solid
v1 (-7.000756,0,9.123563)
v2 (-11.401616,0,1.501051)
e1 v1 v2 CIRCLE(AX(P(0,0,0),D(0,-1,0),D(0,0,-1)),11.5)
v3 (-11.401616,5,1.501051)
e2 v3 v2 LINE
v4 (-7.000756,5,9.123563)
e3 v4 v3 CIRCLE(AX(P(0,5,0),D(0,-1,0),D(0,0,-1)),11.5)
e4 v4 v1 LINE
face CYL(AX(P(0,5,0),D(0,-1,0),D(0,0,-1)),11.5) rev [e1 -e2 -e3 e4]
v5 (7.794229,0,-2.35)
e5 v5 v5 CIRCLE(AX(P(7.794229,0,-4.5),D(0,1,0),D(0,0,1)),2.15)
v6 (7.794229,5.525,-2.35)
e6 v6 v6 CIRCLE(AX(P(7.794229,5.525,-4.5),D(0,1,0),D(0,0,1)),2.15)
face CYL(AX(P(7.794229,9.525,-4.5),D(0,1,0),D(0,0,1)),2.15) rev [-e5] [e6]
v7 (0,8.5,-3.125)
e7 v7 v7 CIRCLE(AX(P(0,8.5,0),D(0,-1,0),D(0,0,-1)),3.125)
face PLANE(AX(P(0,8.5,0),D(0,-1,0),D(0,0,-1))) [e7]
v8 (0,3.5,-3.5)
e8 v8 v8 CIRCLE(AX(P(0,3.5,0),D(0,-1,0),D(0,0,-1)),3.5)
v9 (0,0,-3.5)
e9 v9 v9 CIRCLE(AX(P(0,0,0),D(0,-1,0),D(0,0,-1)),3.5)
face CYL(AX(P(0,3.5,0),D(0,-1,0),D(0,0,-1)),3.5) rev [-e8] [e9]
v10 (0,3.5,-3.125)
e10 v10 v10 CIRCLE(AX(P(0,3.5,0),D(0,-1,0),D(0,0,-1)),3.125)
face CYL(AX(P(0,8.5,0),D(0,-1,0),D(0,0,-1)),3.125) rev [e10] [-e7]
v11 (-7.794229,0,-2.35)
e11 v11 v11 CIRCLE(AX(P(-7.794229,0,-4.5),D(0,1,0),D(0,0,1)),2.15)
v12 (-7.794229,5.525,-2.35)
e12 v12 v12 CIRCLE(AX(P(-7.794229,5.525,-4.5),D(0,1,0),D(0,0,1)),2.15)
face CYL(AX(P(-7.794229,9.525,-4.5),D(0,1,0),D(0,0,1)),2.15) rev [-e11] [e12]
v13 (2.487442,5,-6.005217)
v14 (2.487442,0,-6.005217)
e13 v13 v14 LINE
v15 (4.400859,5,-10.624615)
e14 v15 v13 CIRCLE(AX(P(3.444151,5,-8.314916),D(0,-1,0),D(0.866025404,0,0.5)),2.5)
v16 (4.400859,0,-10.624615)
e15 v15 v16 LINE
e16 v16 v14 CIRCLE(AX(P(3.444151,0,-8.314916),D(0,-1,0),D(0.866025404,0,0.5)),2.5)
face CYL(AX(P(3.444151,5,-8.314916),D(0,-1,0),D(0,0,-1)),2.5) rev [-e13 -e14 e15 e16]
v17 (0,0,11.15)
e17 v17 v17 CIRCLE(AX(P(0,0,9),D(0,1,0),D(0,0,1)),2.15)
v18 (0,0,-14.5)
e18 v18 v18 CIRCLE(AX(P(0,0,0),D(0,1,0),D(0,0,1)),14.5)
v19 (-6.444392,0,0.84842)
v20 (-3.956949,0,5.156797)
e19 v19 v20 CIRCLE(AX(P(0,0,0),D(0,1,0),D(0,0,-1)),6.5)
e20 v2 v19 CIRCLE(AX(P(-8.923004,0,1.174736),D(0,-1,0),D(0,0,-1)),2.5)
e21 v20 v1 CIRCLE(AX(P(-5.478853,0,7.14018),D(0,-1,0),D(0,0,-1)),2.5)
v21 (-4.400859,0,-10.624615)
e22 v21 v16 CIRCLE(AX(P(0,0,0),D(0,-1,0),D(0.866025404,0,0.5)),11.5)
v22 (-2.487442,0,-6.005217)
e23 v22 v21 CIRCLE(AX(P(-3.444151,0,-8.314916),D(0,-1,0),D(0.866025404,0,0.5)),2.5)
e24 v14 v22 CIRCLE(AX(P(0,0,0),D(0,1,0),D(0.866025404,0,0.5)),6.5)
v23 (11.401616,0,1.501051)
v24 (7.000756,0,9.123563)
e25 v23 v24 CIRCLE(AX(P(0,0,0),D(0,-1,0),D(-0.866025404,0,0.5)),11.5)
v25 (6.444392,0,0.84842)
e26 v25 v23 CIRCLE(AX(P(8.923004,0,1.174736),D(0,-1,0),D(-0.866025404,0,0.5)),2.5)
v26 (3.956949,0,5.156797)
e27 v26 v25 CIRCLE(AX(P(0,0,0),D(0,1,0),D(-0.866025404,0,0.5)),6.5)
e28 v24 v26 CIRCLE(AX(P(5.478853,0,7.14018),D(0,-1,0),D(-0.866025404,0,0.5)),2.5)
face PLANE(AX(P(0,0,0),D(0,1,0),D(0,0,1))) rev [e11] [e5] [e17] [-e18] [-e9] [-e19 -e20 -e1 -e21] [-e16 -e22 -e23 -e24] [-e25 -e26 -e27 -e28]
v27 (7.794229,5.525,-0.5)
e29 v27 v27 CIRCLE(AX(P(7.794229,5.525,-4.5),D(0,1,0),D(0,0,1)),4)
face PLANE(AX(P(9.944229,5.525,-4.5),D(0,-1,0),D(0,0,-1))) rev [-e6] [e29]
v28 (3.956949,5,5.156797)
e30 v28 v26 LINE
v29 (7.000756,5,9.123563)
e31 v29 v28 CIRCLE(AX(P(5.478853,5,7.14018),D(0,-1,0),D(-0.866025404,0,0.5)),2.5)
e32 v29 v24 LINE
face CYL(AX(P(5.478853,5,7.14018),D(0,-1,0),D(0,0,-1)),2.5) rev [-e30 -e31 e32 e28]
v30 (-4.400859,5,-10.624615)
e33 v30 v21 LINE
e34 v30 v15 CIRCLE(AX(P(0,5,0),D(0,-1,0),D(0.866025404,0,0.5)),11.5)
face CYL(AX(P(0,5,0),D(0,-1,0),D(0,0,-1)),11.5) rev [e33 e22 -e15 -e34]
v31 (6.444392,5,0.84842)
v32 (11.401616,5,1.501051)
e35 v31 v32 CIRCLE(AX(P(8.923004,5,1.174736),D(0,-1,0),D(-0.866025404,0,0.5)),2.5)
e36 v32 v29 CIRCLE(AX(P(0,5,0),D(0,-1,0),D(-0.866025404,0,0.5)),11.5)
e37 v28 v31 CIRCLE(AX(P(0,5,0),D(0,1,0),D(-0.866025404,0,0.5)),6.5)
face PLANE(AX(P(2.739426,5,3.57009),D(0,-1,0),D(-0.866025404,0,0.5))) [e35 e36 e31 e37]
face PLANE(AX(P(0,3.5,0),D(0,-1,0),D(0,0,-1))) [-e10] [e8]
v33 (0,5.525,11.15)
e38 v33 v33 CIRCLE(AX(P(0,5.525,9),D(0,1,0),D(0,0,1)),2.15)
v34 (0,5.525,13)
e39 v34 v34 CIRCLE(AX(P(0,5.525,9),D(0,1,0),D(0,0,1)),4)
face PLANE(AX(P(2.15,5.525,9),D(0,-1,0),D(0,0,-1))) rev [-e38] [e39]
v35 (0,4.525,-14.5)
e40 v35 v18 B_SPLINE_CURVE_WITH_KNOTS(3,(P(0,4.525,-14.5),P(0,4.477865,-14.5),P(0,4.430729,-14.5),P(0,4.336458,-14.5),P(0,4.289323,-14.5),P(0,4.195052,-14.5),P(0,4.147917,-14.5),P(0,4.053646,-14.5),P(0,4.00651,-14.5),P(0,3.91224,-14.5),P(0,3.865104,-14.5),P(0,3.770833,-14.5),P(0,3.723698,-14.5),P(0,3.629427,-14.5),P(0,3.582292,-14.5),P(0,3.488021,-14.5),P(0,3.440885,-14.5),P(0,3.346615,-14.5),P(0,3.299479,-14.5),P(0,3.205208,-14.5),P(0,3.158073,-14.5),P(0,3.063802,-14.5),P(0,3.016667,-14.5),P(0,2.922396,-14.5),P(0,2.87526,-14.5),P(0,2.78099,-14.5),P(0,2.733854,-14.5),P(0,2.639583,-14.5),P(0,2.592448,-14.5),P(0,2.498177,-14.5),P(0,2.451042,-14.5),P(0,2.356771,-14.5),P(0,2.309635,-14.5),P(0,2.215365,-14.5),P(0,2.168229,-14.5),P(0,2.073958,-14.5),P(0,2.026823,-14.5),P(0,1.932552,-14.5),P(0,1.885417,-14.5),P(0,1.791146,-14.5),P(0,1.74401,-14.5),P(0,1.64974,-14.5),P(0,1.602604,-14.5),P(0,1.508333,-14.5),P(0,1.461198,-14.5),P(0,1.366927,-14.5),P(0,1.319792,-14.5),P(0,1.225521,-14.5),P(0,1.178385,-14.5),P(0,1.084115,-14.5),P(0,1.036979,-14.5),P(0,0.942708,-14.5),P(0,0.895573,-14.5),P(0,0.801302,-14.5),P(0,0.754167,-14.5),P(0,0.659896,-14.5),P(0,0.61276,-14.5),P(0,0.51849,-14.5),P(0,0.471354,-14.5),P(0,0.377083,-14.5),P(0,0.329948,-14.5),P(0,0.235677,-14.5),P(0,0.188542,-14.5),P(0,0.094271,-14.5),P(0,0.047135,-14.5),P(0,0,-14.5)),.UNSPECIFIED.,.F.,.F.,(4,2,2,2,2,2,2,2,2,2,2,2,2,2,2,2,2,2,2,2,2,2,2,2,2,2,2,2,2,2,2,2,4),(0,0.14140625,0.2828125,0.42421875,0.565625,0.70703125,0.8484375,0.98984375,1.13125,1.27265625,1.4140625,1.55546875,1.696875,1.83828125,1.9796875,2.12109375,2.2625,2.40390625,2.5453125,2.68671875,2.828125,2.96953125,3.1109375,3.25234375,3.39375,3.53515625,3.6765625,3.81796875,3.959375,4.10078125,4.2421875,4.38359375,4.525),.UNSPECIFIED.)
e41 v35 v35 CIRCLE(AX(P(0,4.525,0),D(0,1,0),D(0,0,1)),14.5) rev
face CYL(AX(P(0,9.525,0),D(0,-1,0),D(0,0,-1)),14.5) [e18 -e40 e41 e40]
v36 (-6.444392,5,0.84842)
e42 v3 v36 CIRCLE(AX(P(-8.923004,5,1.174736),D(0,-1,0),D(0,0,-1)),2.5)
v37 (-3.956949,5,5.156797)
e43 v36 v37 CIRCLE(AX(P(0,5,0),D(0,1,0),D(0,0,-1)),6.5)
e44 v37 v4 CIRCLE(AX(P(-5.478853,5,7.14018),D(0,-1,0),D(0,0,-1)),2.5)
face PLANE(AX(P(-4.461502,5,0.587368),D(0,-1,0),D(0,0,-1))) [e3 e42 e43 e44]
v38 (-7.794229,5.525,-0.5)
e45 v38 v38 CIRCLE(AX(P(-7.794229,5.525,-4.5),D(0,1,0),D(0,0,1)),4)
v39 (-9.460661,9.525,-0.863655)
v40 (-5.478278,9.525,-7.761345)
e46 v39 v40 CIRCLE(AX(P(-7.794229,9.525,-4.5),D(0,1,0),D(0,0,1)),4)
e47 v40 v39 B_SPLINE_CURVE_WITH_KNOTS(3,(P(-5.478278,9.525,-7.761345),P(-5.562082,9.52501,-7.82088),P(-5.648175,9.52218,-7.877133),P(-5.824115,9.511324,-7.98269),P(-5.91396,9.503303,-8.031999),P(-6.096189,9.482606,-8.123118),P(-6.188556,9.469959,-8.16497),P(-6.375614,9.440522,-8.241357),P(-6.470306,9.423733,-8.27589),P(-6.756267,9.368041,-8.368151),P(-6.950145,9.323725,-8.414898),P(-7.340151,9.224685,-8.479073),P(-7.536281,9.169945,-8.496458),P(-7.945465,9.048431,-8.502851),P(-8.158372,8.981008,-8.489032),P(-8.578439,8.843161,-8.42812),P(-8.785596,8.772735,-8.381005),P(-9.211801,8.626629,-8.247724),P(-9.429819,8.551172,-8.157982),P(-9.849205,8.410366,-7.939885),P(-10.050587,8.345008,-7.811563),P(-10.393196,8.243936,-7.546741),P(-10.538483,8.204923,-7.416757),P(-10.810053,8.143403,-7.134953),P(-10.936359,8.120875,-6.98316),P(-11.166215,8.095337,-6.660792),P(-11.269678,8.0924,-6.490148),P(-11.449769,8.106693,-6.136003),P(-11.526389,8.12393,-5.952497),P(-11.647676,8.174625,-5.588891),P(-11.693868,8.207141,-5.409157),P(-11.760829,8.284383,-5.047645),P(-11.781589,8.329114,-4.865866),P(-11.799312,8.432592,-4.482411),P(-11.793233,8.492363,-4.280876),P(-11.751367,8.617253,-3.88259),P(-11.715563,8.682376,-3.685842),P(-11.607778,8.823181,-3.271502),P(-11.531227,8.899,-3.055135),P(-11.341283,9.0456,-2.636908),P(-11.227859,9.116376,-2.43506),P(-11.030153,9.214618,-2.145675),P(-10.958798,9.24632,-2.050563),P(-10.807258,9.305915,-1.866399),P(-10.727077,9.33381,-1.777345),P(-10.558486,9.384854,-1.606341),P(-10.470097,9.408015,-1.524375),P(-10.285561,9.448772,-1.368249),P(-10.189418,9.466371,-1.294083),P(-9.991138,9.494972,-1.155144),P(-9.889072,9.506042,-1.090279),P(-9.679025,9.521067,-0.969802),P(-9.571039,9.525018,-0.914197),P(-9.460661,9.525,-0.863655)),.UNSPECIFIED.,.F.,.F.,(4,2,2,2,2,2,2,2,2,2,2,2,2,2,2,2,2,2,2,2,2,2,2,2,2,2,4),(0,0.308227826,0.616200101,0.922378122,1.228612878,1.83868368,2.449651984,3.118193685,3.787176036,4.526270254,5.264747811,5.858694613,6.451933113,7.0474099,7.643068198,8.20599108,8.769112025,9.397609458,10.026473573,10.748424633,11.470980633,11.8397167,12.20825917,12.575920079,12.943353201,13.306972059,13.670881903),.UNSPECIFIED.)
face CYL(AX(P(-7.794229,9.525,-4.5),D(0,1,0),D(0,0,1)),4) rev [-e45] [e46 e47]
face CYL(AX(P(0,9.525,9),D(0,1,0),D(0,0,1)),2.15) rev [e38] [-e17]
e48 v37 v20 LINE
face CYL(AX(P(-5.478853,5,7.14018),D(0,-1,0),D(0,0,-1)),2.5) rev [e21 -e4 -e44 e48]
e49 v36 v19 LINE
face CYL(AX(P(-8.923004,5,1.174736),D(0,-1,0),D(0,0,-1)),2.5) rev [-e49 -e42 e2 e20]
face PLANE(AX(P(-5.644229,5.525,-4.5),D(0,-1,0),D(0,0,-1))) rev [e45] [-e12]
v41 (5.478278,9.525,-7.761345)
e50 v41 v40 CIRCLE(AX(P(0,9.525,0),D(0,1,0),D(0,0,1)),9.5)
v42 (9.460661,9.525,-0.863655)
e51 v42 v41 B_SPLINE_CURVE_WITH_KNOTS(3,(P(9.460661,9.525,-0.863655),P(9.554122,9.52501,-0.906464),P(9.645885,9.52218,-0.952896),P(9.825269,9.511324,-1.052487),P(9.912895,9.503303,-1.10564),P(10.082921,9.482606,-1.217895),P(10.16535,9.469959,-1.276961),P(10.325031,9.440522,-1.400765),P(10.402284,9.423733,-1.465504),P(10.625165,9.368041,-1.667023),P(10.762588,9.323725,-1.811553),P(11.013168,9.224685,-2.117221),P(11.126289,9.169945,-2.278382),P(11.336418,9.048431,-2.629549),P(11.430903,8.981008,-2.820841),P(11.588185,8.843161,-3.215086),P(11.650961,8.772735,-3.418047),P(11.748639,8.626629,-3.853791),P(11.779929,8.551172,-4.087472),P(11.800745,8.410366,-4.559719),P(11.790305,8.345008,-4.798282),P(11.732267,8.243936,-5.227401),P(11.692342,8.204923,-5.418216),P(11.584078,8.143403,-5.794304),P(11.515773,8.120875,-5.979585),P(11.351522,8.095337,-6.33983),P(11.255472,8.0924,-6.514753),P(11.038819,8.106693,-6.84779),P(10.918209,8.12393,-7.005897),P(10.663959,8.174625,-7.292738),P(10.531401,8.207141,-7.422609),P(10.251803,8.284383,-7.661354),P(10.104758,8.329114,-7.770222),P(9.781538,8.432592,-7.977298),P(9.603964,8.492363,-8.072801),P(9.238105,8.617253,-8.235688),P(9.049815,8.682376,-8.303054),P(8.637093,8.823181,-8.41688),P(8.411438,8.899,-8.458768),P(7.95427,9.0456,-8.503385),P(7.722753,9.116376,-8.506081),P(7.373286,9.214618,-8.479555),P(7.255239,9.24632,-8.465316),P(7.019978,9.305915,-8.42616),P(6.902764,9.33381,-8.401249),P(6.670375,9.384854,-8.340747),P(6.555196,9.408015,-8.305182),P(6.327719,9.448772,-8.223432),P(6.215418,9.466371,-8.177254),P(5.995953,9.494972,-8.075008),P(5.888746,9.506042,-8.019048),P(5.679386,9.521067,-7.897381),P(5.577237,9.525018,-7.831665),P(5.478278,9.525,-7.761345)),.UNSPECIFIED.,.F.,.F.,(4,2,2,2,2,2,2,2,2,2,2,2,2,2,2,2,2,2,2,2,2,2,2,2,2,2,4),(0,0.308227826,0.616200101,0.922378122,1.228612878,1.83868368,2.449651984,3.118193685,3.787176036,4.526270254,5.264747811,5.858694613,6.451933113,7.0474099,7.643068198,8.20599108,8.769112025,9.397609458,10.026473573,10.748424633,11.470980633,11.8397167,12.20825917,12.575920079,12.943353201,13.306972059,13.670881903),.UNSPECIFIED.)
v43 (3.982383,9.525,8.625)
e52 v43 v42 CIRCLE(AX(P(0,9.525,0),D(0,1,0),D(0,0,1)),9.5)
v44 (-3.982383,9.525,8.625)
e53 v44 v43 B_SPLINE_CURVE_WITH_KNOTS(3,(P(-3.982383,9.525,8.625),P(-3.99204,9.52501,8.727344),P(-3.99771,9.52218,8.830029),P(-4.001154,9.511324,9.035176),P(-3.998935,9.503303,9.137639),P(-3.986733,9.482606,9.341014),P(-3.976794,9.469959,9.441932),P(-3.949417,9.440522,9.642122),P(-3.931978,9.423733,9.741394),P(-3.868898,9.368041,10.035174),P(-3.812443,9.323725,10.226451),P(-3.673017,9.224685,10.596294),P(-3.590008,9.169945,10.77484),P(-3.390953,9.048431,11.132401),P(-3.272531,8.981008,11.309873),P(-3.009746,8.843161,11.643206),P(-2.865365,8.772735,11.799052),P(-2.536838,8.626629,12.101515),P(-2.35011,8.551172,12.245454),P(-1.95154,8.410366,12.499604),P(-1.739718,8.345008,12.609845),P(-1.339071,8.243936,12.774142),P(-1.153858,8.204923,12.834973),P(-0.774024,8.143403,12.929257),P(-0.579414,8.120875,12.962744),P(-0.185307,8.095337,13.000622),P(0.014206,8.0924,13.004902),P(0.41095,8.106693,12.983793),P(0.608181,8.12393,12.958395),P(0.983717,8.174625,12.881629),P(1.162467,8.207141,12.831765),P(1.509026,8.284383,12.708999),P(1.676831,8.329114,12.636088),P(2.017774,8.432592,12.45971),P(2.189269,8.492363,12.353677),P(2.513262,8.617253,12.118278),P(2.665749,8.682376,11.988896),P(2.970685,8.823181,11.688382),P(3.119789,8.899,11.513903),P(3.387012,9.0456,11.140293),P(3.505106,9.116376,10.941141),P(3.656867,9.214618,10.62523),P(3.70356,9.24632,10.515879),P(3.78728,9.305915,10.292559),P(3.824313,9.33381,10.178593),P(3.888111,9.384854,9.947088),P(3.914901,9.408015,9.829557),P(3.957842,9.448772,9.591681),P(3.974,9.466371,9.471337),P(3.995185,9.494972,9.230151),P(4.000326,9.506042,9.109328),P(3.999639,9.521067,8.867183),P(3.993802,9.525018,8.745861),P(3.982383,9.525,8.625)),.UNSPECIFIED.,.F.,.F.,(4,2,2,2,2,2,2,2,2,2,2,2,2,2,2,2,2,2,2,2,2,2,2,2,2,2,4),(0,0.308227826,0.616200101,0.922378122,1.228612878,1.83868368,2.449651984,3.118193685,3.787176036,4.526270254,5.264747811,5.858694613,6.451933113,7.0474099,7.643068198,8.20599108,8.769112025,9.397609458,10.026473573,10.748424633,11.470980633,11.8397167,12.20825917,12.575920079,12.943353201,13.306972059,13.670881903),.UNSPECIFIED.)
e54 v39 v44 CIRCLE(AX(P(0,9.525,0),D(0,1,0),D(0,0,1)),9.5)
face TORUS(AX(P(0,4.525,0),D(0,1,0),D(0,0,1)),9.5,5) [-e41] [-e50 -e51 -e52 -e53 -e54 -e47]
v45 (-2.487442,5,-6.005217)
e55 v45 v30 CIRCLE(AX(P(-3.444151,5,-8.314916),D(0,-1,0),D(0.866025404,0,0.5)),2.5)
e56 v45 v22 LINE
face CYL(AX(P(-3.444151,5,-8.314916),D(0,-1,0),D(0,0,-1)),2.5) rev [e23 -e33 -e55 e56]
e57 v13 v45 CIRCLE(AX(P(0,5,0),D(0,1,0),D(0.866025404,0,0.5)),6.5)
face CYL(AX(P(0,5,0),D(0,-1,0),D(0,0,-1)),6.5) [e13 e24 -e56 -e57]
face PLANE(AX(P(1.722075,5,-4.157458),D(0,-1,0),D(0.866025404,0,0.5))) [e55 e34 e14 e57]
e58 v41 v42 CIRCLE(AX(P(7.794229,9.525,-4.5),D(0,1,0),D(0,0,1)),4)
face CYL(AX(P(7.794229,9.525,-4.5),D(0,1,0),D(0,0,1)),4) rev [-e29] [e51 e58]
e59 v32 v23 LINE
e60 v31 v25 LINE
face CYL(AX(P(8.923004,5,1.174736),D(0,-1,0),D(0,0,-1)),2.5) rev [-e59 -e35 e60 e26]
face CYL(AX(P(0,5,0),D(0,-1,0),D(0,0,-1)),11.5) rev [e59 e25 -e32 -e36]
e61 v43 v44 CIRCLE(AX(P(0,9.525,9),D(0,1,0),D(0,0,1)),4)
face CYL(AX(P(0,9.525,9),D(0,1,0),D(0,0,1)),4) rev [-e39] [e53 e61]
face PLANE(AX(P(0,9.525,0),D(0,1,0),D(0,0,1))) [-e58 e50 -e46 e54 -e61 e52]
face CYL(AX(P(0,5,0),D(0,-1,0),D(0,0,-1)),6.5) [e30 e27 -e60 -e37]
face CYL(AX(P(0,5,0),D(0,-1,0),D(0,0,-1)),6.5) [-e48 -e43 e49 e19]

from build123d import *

# Parameters (mm, degrees)
SKETCH1_R                      = 14.5
BOSS_EXTRUDE1_DEPTH            = 9.525
SKETCH2_R                      = 3.5
CUT_EXTRUDE1_DEPTH             = 3.5
SKETCH3_R                      = 3.125
CUT_EXTRUDE2_DEPTH             = 5
CBORE_FOR_M4_SHCS1_D           = 4.3
CBORE_FOR_M4_SHCS1_CBORE_D     = 8
CBORE_FOR_M4_SHCS1_CBORE_DEPTH = 4
CIRPATTERN1_COUNT              = 3
FILLET1_R                      = 5
CUT_EXTRUDE3_DEPTH             = 5
CIRPATTERN2_COUNT              = 3


with BuildPart() as part:
    # Sketch1 → Boss-Extrude1 (new body)
    with BuildSketch(Plane(origin=(0, 0, 0), x_dir=(1, 0, 0), z_dir=(0, 1, 0))):
        with Locations(Location((0, 0, 0), (0, 0, 90))):
            Circle(SKETCH1_R)
    extrude(amount=BOSS_EXTRUDE1_DEPTH)

    # Sketch2 → Cut-Extrude1 (cut)
    with BuildSketch(Plane.XZ):
        with Locations(Location((0, 0, 0), (0, 0, 270))):
            Circle(SKETCH2_R)
    extrude(amount=-CUT_EXTRUDE1_DEPTH, mode=Mode.SUBTRACT)

    # Sketch3 → Cut-Extrude2 (cut)
    with BuildSketch(Plane.XZ.offset(-3.5)):
        with Locations(Location((0, 0, 0), (0, 0, 270))):
            Circle(SKETCH3_R)
    extrude(amount=-CUT_EXTRUDE2_DEPTH, mode=Mode.SUBTRACT)

    # CBORE for M4 SHCS1 (through all)
    with Locations(Plane(origin=(0, 9.525, 0), x_dir=(-1, 0, 0), z_dir=(0, 1, 0))):
        with Locations((0, 9)):
            cbore_for_m4_shcs1 = CounterBoreHole(CBORE_FOR_M4_SHCS1_D / 2, CBORE_FOR_M4_SHCS1_CBORE_D / 2, CBORE_FOR_M4_SHCS1_CBORE_DEPTH)

    # CirPattern1: CBORE for M4 SHCS1 ×3 about axis
    cirpattern1_axis = Axis((0, 0, 0), (0, 1, 0))
    for i in range(1, CIRPATTERN1_COUNT):
        add(cbore_for_m4_shcs1.rotate(cirpattern1_axis, i * 360 / CIRPATTERN1_COUNT), mode=Mode.SUBTRACT)

    # Fillet1
    # the kernel refuses this fillet: 5 mm, written as the material it takes off along each edge
    with BuildSketch(Plane(origin=(0, 9.525, 0), x_dir=(0, 0, -1), z_dir=(1, 0, 0))) as fillet1_piece_1:
        with BuildLine():
            CenterArc((14.5 - FILLET1_R, -FILLET1_R), FILLET1_R, 0, 90)
            Line((14.5 - FILLET1_R, 0), (14.5, 0))
            Line((14.5, 0), (14.5, -FILLET1_R))
        make_face()
    revolve(axis=Axis((0, 9.525, 0), (0, 1, 0)), mode=Mode.SUBTRACT)

    # Sketch6 → Cut-Extrude3 (cut)
    with BuildSketch(Plane.XZ):
        with BuildLine():
            ThreePointArc((-11.401615906, 1.501051211), (-9.249319233, -1.303876423), (-6.444391599, 0.848420249))
            ThreePointArc((-6.444391599, 0.848420249), (-5.629165125, 3.25), (-3.956949289, 5.156796712))
            ThreePointArc((-3.956949289, 5.156796712), (-3.49546951, 8.662083635), (-7.000756434, 9.123563413))
            ThreePointArc((-7.000756434, 9.123563413), (-9.959292144, 5.75), (-11.401615906, 1.501051211))
        make_face()
    cut_extrude3 = extrude(amount=-CUT_EXTRUDE3_DEPTH, mode=Mode.SUBTRACT)

    # CirPattern2: Cut-Extrude3 ×3 about axis
    cirpattern2_axis = Axis((0, 0, 0), (0, 1, 0))
    for i in range(1, CIRPATTERN2_COUNT):
        add(cut_extrude3.rotate(cirpattern2_axis, i * 360 / CIRPATTERN2_COUNT), mode=Mode.SUBTRACT)


solid = part.part
